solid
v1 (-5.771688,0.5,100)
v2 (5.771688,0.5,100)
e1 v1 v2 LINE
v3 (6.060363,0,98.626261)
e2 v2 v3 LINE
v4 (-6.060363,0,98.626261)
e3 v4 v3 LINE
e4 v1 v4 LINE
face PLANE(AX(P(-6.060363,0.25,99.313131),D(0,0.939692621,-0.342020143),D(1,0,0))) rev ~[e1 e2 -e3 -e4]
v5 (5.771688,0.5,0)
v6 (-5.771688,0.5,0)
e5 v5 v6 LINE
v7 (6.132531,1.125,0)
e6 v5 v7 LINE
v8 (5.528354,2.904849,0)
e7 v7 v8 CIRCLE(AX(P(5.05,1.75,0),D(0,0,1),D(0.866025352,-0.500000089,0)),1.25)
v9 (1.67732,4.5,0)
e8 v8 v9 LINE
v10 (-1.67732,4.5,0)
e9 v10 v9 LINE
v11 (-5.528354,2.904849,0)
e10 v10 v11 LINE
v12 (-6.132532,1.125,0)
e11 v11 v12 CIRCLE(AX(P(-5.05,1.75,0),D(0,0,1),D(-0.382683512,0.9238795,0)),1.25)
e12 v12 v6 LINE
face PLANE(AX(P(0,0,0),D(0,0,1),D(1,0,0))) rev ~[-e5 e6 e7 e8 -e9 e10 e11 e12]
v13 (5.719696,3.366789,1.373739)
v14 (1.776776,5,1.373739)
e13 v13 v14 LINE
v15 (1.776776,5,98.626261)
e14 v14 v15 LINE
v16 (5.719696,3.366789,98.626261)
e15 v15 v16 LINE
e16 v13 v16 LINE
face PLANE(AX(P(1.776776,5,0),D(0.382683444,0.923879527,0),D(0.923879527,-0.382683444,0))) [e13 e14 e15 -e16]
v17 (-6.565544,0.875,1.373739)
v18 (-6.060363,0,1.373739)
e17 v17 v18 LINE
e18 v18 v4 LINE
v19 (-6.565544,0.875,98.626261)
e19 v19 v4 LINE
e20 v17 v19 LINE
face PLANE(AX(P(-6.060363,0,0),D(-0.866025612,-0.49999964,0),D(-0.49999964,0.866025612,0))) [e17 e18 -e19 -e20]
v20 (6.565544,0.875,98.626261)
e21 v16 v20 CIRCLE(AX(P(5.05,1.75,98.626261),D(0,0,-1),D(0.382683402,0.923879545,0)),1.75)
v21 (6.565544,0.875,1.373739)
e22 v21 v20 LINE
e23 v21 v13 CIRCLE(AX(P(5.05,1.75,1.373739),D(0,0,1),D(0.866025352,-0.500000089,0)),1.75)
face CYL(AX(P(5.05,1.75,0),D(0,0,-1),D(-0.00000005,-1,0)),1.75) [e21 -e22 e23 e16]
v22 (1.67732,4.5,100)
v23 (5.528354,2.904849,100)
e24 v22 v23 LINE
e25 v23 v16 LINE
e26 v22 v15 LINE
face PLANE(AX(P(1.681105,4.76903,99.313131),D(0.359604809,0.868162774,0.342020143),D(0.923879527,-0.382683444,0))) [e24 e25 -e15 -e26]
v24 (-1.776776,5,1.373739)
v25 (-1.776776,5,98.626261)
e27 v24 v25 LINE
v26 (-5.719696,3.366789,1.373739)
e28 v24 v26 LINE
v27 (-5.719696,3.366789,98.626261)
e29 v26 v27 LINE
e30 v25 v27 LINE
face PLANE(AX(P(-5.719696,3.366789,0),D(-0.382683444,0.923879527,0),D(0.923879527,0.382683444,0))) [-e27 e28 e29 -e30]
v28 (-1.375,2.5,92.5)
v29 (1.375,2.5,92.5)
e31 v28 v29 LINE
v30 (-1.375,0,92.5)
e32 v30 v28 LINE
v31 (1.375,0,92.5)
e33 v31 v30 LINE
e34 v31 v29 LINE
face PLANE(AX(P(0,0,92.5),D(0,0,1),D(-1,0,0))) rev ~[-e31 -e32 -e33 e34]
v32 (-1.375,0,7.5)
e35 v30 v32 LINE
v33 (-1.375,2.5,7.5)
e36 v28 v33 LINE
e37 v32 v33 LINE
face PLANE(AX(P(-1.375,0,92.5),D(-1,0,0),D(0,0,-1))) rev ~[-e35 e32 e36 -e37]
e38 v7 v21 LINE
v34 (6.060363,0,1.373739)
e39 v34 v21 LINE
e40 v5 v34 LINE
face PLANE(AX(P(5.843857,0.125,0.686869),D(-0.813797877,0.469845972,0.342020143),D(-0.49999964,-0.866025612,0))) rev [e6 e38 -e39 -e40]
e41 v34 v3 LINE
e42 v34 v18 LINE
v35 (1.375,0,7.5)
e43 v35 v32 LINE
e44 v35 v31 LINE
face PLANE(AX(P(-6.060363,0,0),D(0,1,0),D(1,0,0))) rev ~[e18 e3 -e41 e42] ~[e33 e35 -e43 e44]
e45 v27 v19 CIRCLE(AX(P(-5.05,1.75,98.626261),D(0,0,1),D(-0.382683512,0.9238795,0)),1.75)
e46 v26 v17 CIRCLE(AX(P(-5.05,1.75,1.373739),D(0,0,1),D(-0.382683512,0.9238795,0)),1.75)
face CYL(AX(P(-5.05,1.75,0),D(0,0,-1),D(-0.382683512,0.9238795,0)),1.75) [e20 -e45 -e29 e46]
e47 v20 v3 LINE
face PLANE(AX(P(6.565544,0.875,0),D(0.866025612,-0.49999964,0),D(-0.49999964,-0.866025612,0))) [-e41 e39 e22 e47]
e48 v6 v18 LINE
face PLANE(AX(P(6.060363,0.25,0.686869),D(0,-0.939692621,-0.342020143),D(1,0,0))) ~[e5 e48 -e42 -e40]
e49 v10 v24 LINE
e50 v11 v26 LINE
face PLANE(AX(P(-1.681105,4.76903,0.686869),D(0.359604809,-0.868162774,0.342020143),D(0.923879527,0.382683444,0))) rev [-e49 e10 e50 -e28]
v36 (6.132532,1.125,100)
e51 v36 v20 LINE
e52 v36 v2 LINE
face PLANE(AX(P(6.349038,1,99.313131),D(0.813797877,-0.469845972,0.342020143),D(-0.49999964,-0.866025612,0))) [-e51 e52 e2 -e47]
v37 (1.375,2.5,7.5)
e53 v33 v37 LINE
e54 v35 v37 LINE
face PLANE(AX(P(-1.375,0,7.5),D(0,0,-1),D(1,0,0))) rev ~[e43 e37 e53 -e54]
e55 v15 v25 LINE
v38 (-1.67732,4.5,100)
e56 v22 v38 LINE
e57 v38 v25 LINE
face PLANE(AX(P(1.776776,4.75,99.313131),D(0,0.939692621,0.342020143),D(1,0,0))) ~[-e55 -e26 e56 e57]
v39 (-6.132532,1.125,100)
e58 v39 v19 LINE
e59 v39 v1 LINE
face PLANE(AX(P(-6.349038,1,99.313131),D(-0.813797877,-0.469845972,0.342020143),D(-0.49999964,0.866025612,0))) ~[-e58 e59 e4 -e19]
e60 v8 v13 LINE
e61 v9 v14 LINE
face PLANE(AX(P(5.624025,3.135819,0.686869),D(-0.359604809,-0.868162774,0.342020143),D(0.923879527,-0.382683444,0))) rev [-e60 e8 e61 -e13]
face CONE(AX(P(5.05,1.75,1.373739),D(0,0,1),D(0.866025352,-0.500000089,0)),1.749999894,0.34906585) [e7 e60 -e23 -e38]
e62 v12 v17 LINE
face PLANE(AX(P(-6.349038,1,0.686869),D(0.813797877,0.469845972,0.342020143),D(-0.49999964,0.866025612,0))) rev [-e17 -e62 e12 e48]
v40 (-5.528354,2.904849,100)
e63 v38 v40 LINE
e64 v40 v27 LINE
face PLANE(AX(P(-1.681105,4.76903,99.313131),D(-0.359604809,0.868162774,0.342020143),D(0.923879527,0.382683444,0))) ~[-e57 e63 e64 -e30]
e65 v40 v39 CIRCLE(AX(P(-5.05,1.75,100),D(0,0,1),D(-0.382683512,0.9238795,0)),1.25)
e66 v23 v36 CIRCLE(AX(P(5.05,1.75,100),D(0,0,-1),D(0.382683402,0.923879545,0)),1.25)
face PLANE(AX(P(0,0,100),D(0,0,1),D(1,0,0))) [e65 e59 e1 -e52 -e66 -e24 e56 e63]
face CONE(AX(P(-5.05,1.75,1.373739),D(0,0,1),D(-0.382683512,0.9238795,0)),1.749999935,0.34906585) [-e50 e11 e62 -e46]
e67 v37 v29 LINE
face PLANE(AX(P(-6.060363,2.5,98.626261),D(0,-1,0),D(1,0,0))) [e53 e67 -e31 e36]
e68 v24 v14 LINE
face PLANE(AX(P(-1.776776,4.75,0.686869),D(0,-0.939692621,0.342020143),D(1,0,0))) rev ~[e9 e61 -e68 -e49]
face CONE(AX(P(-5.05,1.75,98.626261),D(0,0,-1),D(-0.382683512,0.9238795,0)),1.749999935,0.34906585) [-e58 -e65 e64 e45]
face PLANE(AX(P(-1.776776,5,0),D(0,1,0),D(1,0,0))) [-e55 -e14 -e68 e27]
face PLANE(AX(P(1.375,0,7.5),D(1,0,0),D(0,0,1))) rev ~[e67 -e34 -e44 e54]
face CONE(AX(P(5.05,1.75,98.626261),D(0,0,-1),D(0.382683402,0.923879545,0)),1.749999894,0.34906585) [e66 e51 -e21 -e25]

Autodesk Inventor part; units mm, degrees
ref_plane "YZ Plane" through (0, 0, 0) normal (1, 0, 0) x (0, 1, 0)
ref_plane "XZ Plane" through (0, 0, 0) normal (0, 1, 0) x (-1, 0, 0)
ref_plane "XY Plane" through (0, 0, 0) normal (0, 0, 1) x (1, 0, 0)
sketch "Náčrt1" plane through (0, 0, 0) normal (0, 0, 1) x (1, 0, 0)
  line L0 (-5.05, 0) -> (5.05, 0)
  line L1 (0, -1.329763) -> (0, 6.054961)
  line L2 (-9.941711, 0) -> (9.941711, 0)
  line L3 (-5.719696, 3.366789) -> (-1.776776, 5)
  line L4 (-1.776776, 5) -> (1.776776, 5)
  line L5 (1.776776, 5) -> (5.719696, 3.366789)
  arc A0 (-5.719696, 3.366789) -> (-5.05, 0) centre (-5.05, 1.75) ccw
  arc A1 (5.05, 0) -> (5.719696, 3.366789) centre (5.05, 1.75) ccw
  line L6 (6.565544, 0.875) -> (6.060363, 0)
  line L7 (6.060363, 0) -> (5.05, 0)
  arc A2 (5.05, 0) -> (6.565544, 0.875) centre (5.05, 1.75) ccw
  line L8 (-5.05, 0) -> (-6.060363, 0)
  line L9 (-6.060363, 0) -> (-6.565544, 0.875)
  arc A3 (-6.565544, 0.875) -> (-5.05, 0) centre (-5.05, 1.75) ccw
  point P0 (0, 0)
  dimension "d0" = 135
  dimension "d1" = 1.75
  dimension "d2" = 13.6
  dimension "d3" = 5
  dimension "d12" = 60
extrude "Vysunutí1" add sketch "Náčrt1" along normal blind 100
chamfer "Zkosení1" distance 0.5 angle 70 6 edges at (3.7482, 4.1834, 100) (6.7071, 2.3125, 100) (0, 0, 100) (-6.7071, 2.3125, 100) (-3.7482, 4.1834, 100) (0, 5, 100) measured on face at (0.5923, 1.6667, 100)
chamfer "Zkosení2" distance 0.5 angle 70 6 edges at (0, 0, 0) (6.7071, 2.3125, 0) (3.7482, 4.1834, 0) (-6.7071, 2.3125, 0) (-3.7482, 4.1834, 0) (0, 5, 0) measured on face at (0.5923, 1.6667, 0)
sketch "Náčrt2" plane through (-6.060363, 0, 98.626261) normal (0, -1, 0) x (1, 0, 0)
  line L0 (6.060363, -118.626261) -> (6.060363, 21.373739)
  line L1 (-3.459637, -98.626261) -> (15.580363, -98.626261)
  line L2 (12.120726, -97.252523) -> (0, -97.252523)
  line L3 (12.120726, -97.252523) -> (12.120726, 0)
  line L4 (0, 0) -> (12.120726, 0)
  line L5 (0, -97.252523) -> (0, 0)
  line L6 (7.435363, -6.126261) -> (4.685363, -6.126261)
  line L7 (4.685363, -6.126261) -> (4.685363, -91.126261)
  line L8 (4.685363, -91.126261) -> (7.435363, -91.126261)
  line L9 (7.435363, -91.126261) -> (7.435363, -6.126261)
  line L10 (11.832051, 1.373739) -> (0.288675, 1.373739)
  point P0 (6.060363, -98.626261)
  dimension "d13" = 2.75
  dimension "d14" = 7.5
  dimension "d15" = 7.5
extrude "Vysunutí2" cut sketch "Náčrt2" against normal blind 2.5 contours L8 L7 L6 L0 | L0 L6 L9 L8
equation "\"d9\" = d6"
equation "\"d11\" = d8"
equation "\"d15\" = d14"
equation "\"d6\" = 0.5"
equation "\"d8\" = 70deg"
